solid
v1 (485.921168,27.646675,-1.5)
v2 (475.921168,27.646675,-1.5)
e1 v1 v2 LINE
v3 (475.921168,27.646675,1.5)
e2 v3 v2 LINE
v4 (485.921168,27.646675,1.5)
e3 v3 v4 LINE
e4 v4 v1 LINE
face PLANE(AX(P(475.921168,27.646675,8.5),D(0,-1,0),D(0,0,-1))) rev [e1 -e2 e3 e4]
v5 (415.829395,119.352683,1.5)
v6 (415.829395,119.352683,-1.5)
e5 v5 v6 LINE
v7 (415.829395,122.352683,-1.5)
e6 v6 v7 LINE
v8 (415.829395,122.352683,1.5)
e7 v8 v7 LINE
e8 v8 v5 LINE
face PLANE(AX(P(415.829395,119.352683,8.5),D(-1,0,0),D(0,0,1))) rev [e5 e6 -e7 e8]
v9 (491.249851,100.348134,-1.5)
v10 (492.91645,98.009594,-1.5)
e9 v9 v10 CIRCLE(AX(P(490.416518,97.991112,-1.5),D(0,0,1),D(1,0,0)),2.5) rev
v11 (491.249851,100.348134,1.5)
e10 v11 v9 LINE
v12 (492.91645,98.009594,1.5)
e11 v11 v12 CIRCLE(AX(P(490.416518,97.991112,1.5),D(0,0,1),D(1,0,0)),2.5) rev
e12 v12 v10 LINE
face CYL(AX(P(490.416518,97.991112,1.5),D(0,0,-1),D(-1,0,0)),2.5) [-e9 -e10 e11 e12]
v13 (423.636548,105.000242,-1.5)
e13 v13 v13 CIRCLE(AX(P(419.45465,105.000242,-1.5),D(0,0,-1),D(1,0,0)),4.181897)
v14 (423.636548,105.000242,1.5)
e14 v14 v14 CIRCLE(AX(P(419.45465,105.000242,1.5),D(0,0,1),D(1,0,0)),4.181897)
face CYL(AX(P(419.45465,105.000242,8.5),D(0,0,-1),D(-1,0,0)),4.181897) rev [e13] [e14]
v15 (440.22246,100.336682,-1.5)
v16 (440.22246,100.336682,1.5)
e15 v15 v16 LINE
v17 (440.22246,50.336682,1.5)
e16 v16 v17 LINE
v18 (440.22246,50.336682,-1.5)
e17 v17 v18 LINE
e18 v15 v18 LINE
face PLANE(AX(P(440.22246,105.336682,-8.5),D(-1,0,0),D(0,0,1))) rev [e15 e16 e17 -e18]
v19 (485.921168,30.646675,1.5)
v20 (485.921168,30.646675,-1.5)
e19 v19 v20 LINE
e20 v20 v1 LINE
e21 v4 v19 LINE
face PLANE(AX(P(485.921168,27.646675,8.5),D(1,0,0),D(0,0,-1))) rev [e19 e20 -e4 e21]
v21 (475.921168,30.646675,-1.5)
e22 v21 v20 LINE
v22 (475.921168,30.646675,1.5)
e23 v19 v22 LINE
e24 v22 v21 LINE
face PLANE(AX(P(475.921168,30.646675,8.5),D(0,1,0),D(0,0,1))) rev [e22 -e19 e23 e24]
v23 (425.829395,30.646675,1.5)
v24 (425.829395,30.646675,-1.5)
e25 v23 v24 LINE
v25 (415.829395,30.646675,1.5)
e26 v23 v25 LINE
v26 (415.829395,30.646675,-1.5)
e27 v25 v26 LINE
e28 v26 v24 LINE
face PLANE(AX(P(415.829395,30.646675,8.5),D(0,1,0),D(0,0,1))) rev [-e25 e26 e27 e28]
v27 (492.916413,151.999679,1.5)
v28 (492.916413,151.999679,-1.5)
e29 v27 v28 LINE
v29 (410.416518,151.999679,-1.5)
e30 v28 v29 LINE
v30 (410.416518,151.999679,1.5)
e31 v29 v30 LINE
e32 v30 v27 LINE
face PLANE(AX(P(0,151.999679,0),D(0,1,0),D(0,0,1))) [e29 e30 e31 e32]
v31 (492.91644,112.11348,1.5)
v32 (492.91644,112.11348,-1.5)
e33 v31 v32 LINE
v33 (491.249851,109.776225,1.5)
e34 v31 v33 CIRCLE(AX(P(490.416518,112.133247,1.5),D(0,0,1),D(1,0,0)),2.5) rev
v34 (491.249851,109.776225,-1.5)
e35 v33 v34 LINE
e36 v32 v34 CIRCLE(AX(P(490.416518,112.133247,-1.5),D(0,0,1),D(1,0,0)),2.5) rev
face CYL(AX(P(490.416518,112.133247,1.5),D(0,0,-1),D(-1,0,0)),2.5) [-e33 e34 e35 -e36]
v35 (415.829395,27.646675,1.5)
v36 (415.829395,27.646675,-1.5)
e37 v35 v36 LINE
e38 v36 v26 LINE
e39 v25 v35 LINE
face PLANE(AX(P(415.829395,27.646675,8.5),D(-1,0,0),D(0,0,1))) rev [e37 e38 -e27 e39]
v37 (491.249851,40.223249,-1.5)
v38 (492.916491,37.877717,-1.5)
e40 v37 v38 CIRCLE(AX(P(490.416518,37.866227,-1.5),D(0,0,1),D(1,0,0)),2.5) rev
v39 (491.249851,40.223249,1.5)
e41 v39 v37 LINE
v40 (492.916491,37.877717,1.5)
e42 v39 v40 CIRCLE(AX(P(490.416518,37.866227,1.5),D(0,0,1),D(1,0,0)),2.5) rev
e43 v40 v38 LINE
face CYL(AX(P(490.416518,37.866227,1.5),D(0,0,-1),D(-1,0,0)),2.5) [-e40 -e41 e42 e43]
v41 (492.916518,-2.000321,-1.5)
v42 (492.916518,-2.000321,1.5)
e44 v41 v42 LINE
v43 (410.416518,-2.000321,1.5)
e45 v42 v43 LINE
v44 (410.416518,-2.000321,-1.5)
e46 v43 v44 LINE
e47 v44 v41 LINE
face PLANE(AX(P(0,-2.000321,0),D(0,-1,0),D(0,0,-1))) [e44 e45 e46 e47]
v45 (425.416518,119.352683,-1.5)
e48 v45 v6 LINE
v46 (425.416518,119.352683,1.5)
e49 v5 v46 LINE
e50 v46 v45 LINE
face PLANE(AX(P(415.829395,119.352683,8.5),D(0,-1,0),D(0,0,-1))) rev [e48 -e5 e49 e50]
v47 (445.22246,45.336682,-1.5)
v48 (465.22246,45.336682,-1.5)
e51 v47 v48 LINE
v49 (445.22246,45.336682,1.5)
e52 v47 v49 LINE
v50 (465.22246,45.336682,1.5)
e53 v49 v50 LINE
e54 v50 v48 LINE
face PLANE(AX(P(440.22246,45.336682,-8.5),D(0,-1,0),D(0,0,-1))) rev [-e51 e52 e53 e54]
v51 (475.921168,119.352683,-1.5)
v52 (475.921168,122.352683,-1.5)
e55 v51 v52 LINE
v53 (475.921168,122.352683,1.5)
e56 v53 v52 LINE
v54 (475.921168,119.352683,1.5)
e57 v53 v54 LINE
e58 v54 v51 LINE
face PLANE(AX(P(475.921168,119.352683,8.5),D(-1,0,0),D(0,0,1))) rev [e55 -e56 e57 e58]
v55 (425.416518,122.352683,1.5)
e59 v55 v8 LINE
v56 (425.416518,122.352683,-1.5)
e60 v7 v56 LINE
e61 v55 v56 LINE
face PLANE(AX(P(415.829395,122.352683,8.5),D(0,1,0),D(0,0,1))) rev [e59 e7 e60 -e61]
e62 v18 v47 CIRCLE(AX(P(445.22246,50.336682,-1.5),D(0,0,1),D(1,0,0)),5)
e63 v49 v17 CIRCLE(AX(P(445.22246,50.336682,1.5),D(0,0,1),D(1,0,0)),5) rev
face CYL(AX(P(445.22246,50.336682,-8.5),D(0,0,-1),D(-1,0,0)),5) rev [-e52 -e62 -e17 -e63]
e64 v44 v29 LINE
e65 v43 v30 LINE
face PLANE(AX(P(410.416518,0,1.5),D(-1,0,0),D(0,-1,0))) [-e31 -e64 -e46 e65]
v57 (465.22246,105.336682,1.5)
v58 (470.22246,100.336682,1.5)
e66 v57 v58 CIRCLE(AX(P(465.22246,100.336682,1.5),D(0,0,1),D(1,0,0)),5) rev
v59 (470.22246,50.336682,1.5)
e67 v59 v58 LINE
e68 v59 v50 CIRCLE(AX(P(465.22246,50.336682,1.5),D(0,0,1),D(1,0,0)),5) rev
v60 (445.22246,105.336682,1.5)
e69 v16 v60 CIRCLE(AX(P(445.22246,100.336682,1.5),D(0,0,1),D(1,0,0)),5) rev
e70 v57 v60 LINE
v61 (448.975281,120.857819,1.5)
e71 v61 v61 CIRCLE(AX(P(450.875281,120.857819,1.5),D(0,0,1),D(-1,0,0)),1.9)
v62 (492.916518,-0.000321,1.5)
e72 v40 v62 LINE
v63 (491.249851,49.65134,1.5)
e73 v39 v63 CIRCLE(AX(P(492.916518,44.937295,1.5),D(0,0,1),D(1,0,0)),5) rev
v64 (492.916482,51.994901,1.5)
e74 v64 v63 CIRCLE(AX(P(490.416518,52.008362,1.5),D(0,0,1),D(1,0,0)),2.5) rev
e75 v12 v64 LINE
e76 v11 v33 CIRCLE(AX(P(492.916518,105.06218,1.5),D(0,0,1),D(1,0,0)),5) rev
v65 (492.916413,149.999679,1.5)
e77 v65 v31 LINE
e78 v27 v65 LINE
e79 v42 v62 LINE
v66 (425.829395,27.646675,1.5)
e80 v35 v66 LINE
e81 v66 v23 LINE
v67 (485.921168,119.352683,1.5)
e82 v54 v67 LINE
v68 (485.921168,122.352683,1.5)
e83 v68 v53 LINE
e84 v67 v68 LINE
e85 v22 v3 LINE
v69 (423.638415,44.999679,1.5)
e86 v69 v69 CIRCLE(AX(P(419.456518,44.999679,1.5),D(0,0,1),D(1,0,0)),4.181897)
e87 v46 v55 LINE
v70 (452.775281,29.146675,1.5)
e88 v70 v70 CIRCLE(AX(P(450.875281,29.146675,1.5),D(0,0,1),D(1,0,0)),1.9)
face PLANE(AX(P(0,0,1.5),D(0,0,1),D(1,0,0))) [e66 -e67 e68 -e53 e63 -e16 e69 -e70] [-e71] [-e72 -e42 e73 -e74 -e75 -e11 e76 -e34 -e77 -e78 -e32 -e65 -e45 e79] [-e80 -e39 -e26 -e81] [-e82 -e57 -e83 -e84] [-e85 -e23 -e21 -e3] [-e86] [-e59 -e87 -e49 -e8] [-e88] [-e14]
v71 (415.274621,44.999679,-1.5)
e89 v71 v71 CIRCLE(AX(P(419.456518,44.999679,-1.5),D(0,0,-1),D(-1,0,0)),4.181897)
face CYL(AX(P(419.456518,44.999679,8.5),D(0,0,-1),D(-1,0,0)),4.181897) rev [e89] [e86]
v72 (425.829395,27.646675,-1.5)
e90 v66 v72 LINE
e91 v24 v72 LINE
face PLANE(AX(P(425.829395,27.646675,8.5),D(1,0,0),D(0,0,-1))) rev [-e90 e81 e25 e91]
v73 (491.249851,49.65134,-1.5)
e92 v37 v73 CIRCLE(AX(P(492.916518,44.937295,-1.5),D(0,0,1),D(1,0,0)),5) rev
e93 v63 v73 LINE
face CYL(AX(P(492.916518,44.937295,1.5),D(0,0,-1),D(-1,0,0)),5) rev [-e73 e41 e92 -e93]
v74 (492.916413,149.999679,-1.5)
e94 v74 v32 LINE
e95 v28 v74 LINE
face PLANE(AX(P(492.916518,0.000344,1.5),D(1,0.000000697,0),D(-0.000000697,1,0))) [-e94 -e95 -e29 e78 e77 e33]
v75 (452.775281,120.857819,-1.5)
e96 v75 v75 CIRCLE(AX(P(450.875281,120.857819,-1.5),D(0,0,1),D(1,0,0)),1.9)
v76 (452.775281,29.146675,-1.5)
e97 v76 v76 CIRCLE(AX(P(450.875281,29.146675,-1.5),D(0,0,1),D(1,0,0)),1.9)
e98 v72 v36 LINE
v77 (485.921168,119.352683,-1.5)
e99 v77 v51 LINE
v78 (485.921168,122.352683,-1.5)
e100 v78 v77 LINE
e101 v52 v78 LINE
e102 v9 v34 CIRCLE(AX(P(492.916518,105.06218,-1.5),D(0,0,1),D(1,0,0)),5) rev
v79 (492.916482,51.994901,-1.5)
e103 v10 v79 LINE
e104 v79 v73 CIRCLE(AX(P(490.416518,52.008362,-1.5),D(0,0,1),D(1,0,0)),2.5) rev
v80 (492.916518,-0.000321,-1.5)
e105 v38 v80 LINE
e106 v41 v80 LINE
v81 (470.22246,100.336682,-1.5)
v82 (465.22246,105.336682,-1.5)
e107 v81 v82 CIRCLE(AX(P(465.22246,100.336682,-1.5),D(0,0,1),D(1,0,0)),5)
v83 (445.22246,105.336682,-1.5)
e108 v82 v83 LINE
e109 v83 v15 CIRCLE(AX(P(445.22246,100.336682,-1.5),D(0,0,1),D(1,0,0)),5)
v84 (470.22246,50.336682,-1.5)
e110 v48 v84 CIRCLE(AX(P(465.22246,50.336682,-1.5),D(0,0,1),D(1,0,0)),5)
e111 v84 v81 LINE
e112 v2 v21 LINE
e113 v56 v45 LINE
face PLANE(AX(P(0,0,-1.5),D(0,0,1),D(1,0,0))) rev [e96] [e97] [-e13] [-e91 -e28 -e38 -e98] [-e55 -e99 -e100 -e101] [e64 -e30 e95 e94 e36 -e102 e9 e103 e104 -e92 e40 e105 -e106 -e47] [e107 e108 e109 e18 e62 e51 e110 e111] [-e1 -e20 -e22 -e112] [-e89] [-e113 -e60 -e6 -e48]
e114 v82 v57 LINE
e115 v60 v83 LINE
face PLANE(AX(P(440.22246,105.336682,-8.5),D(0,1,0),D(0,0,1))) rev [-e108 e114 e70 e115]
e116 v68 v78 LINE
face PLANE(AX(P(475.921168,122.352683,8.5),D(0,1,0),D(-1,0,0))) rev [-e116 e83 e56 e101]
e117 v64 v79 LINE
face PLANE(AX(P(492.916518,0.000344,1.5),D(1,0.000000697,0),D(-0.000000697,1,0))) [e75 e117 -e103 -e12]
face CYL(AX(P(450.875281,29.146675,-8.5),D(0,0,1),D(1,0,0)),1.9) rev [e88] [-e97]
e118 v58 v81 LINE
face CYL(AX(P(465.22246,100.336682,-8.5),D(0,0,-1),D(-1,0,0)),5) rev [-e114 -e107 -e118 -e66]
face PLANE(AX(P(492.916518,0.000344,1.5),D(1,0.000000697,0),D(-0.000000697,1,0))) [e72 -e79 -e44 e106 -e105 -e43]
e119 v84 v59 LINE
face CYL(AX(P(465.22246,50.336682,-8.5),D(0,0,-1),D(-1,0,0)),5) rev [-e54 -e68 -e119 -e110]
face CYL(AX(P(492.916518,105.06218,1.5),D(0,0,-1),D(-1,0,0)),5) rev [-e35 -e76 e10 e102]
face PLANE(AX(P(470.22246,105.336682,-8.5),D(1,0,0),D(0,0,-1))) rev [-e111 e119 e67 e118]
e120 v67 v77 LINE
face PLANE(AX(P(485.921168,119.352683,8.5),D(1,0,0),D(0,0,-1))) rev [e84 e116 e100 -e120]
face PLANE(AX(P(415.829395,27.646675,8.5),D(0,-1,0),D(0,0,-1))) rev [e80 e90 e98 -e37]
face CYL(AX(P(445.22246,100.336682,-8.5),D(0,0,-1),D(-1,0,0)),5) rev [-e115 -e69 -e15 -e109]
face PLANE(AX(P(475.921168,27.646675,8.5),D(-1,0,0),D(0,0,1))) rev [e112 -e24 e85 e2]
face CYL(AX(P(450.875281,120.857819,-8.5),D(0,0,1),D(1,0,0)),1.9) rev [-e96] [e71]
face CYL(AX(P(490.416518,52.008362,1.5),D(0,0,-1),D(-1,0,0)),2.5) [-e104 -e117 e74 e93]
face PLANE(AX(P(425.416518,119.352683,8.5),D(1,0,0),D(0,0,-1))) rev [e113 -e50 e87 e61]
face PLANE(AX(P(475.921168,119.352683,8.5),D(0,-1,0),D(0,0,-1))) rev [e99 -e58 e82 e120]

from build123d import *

# Parameters (mm, degrees)
SALIENTE_EXTRUIR1_START = -1.5
SALIENTE_EXTRUIR1_DEPTH = 3
CROQUIS4_W              = 30
CROQUIS4_H              = 60
CORTAR_EXTRUIR3_DEPTH   = 10
CROQUIS5_W              = 9.999999994
CROQUIS5_H              = 3
CROQUIS5_W_2            = 9.587122789
CORTAR_EXTRUIR4_DEPTH   = 10
CROQUIS6_R              = 1.9
CORTAR_EXTRUIR5_DEPTH   = 10
REDONDEO1_R             = 5
CROQUIS7_W              = 82.5
CROQUIS7_H              = 3
SALIENTE_EXTRUIR2_DEPTH = 2
CROQUIS8_W              = 82.49989544
CROQUIS8_H              = 3
SALIENTE_EXTRUIR3_DEPTH = 2
CROQUIS9_R              = 4.181897372
CORTAR_EXTRUIR6_DEPTH   = 10


# Read off the part's stored shape, not the designer's step: Saliente-Extruir1
with BuildPart() as part:
    # Saliente-Extruir1 outline → Saliente-Extruir1 (new body)
    with BuildSketch(Plane.XY.offset(SALIENTE_EXTRUIR1_START)):
        with BuildLine():
            ThreePointArc((492.916449572, 98.009593947), (492.452410006, 99.442022929), (491.249851225, 100.348134338))
            ThreePointArc((491.249851225, 100.348134338), (487.916517891, 105.062179546), (491.249851225, 109.776224754))
            ThreePointArc((491.249851225, 109.776224754), (492.452037009, 110.681812922), (492.916439741, 112.113480025))
            Line((492.916439741, 112.113480025), (492.916413331, 149.999679341))
            Line((492.916413331, 149.999679341), (410.416517891, 149.999679341))
            Line((410.416517891, 149.999679341), (410.416517891, -0.000320659))
            Line((410.416517891, -0.000320659), (492.916517891, -0.000320659))
            Line((492.916517891, -0.000320659), (492.916491488, 37.877716604))
            ThreePointArc((492.916491488, 37.877716604), (492.45443711, 39.314289338), (491.249851225, 40.223249354))
            ThreePointArc((491.249851225, 40.223249354), (487.916517891, 44.937294562), (491.249851225, 49.65133977))
            ThreePointArc((491.249851225, 49.65133977), (492.453865854, 50.559496169), (492.916481647, 51.994900607))
            Line((492.916481647, 51.994900607), (492.916449572, 98.009593947))
        make_face()
    extrude(amount=SALIENTE_EXTRUIR1_DEPTH)

    # Croquis4 → Cortar-Extruir3 (cut)
    with BuildSketch(Plane.XY.offset(1.5)):
        with Locations((455.222459901, 75.336681949)):
            Rectangle(CROQUIS4_W, CROQUIS4_H)
    extrude(amount=-CORTAR_EXTRUIR3_DEPTH, mode=Mode.SUBTRACT)

    # Croquis5 → Cortar-Extruir4 (cut)
    with BuildSketch(Plane(origin=(0, 0, -1.5), x_dir=(-1, 0, 0), z_dir=(0, 0, -1))):
        with Locations((-420.82939509, 29.146675475)):
            Rectangle(CROQUIS5_W, CROQUIS5_H)
        with Locations((-480.921167725, 29.146675475)):
            Rectangle(CROQUIS5_W, CROQUIS5_H)
        with Locations((-480.921167725, 120.852683208)):
            Rectangle(CROQUIS5_W, CROQUIS5_H)
        with Locations((-420.622956488, 120.852683208)):
            Rectangle(CROQUIS5_W_2, CROQUIS5_H)
    extrude(amount=-CORTAR_EXTRUIR4_DEPTH, mode=Mode.SUBTRACT)

    # Croquis6 → Cortar-Extruir5 (cut)
    with BuildSketch(Plane.XY.offset(1.5)):
        with Locations((450.875281407, 29.146675475)):
            Circle(CROQUIS6_R)
        with Locations((450.875281407, 120.857819079)):
            Circle(CROQUIS6_R)
    extrude(amount=-CORTAR_EXTRUIR5_DEPTH, mode=Mode.SUBTRACT)

    # Redondeo1
    redondeo1_edges = [part.edges().sort_by_distance(p)[0] for p in [
        (470.222459901, 105.336681949, 0),
        (470.222459901, 45.336681949, 0),
        (440.222459901, 45.336681949, 0),
        (440.222459901, 105.336681949, 0),
    ]]
    fillet(redondeo1_edges, radius=REDONDEO1_R)

    # Croquis7 → Saliente-Extruir2 (add)
    with BuildSketch(Plane.XZ.offset(0.000320659)):
        with Locations((451.666517891, 0)):
            Rectangle(CROQUIS7_W, CROQUIS7_H)
    extrude(amount=SALIENTE_EXTRUIR2_DEPTH)

    # Croquis8 → Saliente-Extruir3 (add)
    with BuildSketch(Plane(origin=(0, 149.999679341, 0), x_dir=(1, 0, 0), z_dir=(0, 1, 0))):
        with Locations((451.666465611, 0)):
            Rectangle(CROQUIS8_W, CROQUIS8_H)
    extrude(amount=SALIENTE_EXTRUIR3_DEPTH)

    # Croquis9 → Cortar-Extruir6 (cut)
    with BuildSketch(Plane(origin=(0, 0, -1.5), x_dir=(-1, 0, 0), z_dir=(0, 0, -1))):
        with Locations((-419.456517891, 44.999679341)):
            Circle(CROQUIS9_R)
        with Locations(Location((-419.454650283, 105.000242051, 0), (0, 0, 180))):
            Circle(CROQUIS9_R)
    extrude(amount=-CORTAR_EXTRUIR6_DEPTH, mode=Mode.SUBTRACT)


solid = part.part
